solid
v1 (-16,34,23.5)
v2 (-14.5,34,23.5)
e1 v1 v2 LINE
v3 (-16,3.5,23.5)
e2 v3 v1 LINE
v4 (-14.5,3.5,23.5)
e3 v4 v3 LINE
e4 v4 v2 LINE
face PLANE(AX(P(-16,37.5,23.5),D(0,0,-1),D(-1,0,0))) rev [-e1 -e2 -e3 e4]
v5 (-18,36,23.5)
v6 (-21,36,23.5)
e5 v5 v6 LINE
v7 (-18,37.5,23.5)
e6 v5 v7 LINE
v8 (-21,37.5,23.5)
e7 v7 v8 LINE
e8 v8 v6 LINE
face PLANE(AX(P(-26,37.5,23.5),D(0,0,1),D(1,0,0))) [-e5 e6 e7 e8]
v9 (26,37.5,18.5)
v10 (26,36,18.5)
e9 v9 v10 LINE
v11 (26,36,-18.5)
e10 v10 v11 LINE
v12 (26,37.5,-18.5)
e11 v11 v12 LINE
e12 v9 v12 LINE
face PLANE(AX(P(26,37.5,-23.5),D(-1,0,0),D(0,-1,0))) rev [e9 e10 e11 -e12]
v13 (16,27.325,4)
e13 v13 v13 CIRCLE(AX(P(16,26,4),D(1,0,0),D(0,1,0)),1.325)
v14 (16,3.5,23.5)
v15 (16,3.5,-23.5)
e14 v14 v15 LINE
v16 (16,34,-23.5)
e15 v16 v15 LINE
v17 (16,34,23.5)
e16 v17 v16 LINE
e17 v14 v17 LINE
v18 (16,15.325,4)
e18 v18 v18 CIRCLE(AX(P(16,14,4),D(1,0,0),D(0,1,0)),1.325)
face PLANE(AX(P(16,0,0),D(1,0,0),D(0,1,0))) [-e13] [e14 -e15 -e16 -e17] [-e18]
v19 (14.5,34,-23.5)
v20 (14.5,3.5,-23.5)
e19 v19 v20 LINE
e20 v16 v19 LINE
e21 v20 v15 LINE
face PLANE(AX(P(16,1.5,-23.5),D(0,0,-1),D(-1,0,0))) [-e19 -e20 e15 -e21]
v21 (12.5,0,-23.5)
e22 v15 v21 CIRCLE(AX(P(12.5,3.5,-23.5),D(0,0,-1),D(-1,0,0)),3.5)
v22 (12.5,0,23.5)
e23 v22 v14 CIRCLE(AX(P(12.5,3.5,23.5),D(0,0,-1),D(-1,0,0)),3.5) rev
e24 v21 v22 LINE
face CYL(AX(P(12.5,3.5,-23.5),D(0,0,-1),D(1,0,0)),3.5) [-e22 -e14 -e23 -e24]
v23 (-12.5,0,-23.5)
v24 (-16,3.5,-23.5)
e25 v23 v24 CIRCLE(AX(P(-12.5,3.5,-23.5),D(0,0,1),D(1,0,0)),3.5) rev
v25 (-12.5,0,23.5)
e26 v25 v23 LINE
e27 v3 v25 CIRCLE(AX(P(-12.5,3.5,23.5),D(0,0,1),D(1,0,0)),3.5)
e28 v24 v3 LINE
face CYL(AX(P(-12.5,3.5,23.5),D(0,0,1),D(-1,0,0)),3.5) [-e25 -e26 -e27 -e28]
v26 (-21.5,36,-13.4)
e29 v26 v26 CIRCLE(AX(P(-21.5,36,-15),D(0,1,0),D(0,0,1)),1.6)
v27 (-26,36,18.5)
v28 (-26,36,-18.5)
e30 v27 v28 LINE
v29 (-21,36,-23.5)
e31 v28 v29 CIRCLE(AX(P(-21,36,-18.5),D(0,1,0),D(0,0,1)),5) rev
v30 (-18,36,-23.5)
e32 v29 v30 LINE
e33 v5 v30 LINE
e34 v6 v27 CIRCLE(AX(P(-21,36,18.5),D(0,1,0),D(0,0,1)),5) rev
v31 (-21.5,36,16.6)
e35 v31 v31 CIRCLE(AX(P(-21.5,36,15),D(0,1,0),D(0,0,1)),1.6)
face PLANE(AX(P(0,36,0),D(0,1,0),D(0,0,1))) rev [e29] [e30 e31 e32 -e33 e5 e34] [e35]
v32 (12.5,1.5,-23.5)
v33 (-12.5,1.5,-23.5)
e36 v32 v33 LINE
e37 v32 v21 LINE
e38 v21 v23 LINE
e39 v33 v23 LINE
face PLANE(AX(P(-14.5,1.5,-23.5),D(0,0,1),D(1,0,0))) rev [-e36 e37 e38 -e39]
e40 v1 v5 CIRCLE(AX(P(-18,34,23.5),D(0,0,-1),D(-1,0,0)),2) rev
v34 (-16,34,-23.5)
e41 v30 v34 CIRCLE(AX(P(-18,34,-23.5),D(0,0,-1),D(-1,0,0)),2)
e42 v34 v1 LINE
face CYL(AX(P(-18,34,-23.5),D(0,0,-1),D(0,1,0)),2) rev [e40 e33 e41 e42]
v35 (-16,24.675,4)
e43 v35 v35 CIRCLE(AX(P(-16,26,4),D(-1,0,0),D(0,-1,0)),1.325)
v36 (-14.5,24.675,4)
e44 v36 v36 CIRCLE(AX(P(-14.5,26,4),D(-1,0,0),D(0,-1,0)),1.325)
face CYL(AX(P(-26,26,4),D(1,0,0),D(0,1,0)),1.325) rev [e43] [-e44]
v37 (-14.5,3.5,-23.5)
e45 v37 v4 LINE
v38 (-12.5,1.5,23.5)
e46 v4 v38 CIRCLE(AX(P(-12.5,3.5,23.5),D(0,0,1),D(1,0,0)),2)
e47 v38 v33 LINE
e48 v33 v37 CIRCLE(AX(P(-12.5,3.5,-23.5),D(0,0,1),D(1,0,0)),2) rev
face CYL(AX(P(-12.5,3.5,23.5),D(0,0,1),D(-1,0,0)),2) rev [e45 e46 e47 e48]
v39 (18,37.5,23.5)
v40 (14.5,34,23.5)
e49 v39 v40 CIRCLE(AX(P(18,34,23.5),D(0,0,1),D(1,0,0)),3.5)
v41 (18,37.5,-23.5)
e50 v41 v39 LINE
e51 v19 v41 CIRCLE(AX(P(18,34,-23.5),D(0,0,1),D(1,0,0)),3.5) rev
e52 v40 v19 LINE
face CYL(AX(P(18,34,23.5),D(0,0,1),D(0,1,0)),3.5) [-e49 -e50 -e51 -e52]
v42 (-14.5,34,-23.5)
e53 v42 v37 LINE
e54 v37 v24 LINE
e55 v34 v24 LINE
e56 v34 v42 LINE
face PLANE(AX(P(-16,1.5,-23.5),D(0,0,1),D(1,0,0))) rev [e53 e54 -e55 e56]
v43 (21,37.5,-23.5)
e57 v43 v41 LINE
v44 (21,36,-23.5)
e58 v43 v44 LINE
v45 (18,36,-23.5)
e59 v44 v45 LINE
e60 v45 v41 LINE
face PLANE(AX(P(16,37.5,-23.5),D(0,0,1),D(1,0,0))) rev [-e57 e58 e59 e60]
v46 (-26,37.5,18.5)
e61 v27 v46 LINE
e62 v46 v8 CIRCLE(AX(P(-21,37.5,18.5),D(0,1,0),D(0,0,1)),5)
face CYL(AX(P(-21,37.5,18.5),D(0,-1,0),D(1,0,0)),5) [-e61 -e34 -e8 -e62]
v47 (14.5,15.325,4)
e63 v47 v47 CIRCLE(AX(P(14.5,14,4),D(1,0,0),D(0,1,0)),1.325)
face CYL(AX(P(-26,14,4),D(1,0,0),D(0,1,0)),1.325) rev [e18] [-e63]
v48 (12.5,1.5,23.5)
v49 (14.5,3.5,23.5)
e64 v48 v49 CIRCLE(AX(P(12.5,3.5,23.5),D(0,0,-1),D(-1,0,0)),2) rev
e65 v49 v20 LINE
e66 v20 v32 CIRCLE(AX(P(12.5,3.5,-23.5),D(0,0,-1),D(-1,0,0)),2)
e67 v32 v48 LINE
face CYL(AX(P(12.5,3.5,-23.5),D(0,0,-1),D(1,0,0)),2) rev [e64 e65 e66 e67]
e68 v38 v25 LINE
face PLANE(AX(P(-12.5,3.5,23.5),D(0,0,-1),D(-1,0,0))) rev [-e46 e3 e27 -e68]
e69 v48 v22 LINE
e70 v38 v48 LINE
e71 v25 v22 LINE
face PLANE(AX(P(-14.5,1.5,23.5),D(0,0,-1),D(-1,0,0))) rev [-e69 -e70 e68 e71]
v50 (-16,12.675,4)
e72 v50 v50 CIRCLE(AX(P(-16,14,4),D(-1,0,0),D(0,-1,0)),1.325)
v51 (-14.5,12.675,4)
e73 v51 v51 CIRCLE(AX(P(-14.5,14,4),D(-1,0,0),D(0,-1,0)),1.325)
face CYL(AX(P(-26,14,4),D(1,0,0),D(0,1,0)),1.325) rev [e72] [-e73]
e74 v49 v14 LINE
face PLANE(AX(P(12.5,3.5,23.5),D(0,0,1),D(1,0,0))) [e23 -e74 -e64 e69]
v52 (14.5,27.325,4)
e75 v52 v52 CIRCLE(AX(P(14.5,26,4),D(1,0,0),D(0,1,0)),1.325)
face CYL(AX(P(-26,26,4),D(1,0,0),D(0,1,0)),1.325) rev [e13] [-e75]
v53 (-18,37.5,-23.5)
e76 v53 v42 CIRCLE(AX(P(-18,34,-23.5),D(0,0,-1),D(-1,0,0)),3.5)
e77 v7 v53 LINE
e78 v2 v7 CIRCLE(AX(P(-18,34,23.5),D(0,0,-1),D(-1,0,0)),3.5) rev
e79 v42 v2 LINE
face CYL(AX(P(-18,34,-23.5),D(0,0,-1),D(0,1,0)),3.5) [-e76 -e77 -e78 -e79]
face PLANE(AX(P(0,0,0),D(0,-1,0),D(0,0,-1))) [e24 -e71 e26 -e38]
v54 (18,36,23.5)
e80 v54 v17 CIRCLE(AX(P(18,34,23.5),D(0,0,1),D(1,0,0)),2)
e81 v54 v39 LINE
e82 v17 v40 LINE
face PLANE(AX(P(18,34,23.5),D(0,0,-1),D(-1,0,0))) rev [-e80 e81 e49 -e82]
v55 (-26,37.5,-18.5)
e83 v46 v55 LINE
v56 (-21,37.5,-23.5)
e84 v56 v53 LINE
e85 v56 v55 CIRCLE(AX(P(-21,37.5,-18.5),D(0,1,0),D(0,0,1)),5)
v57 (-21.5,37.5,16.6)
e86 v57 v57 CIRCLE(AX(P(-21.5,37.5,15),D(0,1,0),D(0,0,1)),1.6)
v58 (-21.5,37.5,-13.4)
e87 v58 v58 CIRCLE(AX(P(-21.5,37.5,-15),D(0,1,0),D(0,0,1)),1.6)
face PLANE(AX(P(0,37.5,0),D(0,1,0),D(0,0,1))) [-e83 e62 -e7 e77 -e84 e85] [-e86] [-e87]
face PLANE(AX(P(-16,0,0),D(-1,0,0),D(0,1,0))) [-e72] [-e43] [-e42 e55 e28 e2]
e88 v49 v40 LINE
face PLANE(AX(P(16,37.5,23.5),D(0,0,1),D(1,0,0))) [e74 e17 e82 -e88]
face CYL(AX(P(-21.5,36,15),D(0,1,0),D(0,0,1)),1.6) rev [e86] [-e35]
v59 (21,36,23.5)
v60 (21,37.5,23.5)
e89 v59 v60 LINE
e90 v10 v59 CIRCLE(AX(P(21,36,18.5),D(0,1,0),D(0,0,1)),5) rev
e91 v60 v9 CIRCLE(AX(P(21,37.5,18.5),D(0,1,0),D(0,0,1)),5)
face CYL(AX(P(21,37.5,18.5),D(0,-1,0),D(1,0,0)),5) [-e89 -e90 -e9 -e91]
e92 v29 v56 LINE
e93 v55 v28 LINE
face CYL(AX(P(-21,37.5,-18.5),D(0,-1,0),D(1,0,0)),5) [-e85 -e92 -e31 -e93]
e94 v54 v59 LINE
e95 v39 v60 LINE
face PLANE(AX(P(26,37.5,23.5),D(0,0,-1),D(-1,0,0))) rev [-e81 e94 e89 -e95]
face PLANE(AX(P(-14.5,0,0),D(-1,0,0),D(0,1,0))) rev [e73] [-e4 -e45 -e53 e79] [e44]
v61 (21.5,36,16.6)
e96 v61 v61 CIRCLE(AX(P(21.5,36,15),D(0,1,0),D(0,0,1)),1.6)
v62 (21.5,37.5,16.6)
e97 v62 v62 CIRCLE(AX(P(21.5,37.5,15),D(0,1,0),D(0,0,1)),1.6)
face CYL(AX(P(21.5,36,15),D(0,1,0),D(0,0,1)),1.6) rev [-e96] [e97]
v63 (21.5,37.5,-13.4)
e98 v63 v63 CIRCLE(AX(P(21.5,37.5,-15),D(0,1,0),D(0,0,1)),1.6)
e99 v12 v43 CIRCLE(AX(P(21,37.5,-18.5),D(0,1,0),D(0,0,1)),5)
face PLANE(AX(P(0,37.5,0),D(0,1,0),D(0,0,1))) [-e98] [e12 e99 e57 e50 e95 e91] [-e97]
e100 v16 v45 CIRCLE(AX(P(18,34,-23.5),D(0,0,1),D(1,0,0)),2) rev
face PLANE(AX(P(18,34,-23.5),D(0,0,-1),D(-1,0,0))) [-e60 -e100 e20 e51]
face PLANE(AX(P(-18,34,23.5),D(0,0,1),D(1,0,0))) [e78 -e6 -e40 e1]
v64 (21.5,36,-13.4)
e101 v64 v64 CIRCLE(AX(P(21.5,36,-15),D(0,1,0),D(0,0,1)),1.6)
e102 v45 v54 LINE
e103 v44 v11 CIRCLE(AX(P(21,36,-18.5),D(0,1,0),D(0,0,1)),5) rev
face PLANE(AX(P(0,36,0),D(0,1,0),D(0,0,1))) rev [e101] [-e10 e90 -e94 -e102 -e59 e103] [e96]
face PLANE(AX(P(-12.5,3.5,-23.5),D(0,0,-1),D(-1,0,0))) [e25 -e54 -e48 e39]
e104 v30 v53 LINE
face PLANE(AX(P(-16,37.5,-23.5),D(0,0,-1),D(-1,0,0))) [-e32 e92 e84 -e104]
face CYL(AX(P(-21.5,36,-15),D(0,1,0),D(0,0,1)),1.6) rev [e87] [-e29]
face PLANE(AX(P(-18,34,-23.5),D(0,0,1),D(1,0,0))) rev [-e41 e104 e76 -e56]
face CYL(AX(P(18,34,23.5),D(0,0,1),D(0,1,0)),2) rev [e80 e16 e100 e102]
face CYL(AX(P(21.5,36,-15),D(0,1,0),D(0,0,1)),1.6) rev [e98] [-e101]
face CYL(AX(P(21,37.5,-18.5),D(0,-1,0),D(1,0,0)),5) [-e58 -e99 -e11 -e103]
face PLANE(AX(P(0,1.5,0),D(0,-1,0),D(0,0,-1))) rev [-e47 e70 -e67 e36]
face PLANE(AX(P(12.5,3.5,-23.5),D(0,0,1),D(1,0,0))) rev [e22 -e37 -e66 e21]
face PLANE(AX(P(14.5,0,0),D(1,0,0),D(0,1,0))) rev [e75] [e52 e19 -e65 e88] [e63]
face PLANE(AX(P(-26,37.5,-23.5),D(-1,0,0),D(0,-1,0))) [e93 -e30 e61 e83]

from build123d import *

# Parameters (mm, degrees)
SKETCH1_W                    = 29
SKETCH1_H                    = 47
BASE_FLANGE1_DEPTH           = 1.5
EDGE_FLANGE1_STRIP_W         = 10
EDGE_FLANGE1_STRIP_H         = 1.5
EDGE_FLANGE1_STRIP_CUT_DEPTH = 47
EDGE_FLANGE1_DEPTH           = 47
EDGE_FLANGE2_STRIP_W         = 10
EDGE_FLANGE2_STRIP_H         = 1.5
EDGE_FLANGE2_STRIP_CUT_DEPTH = 47
EDGE_FLANGE2_DEPTH           = 47
SKETCH12_R                   = 1.6
CUT_EXTRUDE1_DEPTH           = 10
SKETCH13_R                   = 1.325
CUT_EXTRUDE2_DEPTH           = 62.012293843
FILLET1_R                    = 5


# Sheet-metal steps are written as plain solids
with BuildPart() as part:
    # Sketch1 → Base-Flange1 (new body)
    with BuildSketch(Plane(origin=(0, 0, 0), x_dir=(1, 0, 0), z_dir=(0, 1, 0))):
        Rectangle(SKETCH1_W, SKETCH1_H)
    extrude(amount=BASE_FLANGE1_DEPTH)

    # Edge-Flange1 strip (across the edge) → Edge-Flange1 strip cut (cut)
    with BuildSketch(Plane(origin=(14.5, 1.5, 23.5), x_dir=(-1, 0, 0), z_dir=(0, 0, -1))):
        with Locations((-3, -0.75)):
            Rectangle(EDGE_FLANGE1_STRIP_W, EDGE_FLANGE1_STRIP_H)
    edge_flange1_strip_cut = extrude(amount=EDGE_FLANGE1_STRIP_CUT_DEPTH, mode=Mode.SUBTRACT)

    # Edge-Flange1 section (across the edge) → Edge-Flange1 (add)
    with BuildSketch(Plane(origin=(14.5, 1.5, 23.5), x_dir=(-1, 0, 0), z_dir=(0, 0, -1))):
        with BuildLine():
            Line((-1.5, 2), (-1.5, 36))
            Line((-1.5, 36), (0, 36))
            Line((0, 36), (0, 2))
            ThreePointArc((0, 2), (0.585786438, 0.585786438), (2, 0))
            Line((2, 0), (2, -1.5))
            ThreePointArc((2, -1.5), (-0.474873734, -0.474873734), (-1.5, 2))
        make_face()
    edge_flange1 = extrude(amount=EDGE_FLANGE1_DEPTH)

    # Mirror1: Edge-Flange1 strip cut, Edge-Flange1 across plane
    add(edge_flange1_strip_cut.mirror(Plane(origin=(0, 0, 0), x_dir=(0, 0, 1), z_dir=(1, 0, 0))), mode=Mode.SUBTRACT)
    add(edge_flange1.mirror(Plane(origin=(0, 0, 0), x_dir=(0, 0, 1), z_dir=(1, 0, 0))))

    # Edge-Flange2 strip (across the edge) → Edge-Flange2 strip cut (cut)
    with BuildSketch(Plane(origin=(-16, 37.5, 23.5), x_dir=(0, -1, 0), z_dir=(0, 0, -1))):
        with Locations((-1.5, -0.75)):
            Rectangle(EDGE_FLANGE2_STRIP_W, EDGE_FLANGE2_STRIP_H)
    edge_flange2_strip_cut = extrude(amount=EDGE_FLANGE2_STRIP_CUT_DEPTH, mode=Mode.SUBTRACT)

    # Edge-Flange2 section (across the edge) → Edge-Flange2 (add)
    with BuildSketch(Plane(origin=(-16, 37.5, 23.5), x_dir=(0, -1, 0), z_dir=(0, 0, -1))):
        with BuildLine():
            Line((0, 2), (0, 10))
            Line((0, 10), (1.5, 10))
            Line((1.5, 10), (1.5, 2))
            ThreePointArc((1.5, 2), (2.085786438, 0.585786438), (3.5, 0))
            Line((3.5, 0), (3.5, -1.5))
            ThreePointArc((3.5, -1.5), (1.025126266, -0.474873734), (0, 2))
        make_face()
    edge_flange2 = extrude(amount=EDGE_FLANGE2_DEPTH)

    # Mirror2: Edge-Flange2 strip cut, Edge-Flange2 across plane
    add(edge_flange2_strip_cut.mirror(Plane(origin=(0, 0, 0), x_dir=(0, 0, 1), z_dir=(1, 0, 0))), mode=Mode.SUBTRACT)
    add(edge_flange2.mirror(Plane(origin=(0, 0, 0), x_dir=(0, 0, 1), z_dir=(1, 0, 0))))

    # Sketch12 → Cut-Extrude1 (cut)
    with BuildSketch(Plane(origin=(0, 37.5, 0), x_dir=(1, 0, 0), z_dir=(0, 1, 0))):
        with Locations(Location((21.5, 15, 0), (0, 0, 270))):
            Circle(SKETCH12_R)
        with Locations(Location((-21.5, 15, 0), (0, 0, 270))):
            Circle(SKETCH12_R)
        with Locations(Location((-21.5, -15, 0), (0, 0, 270))):
            Circle(SKETCH12_R)
        with Locations(Location((21.5, -15, 0), (0, 0, 270))):
            Circle(SKETCH12_R)
    extrude(amount=-CUT_EXTRUDE1_DEPTH, mode=Mode.SUBTRACT)

    # Sketch13 → Cut-Extrude2 (cut, through all)
    with BuildSketch(Plane(origin=(16, 0, 0), x_dir=(0, 0, -1), z_dir=(1, 0, 0))):
        with Locations(Location((-4, 26, 0), (0, 0, 270))):
            Circle(SKETCH13_R)
        with Locations(Location((-4, 14, 0), (0, 0, 270))):
            Circle(SKETCH13_R)
    extrude(amount=-CUT_EXTRUDE2_DEPTH, mode=Mode.SUBTRACT)

    # Fillet1
    fillet1_edges = [part.edges().sort_by_distance(p)[0] for p in [
        (-26, 36.75, 23.5),
        (-26, 36.75, -23.5),
        (26, 36.75, -23.5),
        (26, 36.75, 23.5),
    ]]
    fillet(fillet1_edges, radius=FILLET1_R)


solid = part.part
